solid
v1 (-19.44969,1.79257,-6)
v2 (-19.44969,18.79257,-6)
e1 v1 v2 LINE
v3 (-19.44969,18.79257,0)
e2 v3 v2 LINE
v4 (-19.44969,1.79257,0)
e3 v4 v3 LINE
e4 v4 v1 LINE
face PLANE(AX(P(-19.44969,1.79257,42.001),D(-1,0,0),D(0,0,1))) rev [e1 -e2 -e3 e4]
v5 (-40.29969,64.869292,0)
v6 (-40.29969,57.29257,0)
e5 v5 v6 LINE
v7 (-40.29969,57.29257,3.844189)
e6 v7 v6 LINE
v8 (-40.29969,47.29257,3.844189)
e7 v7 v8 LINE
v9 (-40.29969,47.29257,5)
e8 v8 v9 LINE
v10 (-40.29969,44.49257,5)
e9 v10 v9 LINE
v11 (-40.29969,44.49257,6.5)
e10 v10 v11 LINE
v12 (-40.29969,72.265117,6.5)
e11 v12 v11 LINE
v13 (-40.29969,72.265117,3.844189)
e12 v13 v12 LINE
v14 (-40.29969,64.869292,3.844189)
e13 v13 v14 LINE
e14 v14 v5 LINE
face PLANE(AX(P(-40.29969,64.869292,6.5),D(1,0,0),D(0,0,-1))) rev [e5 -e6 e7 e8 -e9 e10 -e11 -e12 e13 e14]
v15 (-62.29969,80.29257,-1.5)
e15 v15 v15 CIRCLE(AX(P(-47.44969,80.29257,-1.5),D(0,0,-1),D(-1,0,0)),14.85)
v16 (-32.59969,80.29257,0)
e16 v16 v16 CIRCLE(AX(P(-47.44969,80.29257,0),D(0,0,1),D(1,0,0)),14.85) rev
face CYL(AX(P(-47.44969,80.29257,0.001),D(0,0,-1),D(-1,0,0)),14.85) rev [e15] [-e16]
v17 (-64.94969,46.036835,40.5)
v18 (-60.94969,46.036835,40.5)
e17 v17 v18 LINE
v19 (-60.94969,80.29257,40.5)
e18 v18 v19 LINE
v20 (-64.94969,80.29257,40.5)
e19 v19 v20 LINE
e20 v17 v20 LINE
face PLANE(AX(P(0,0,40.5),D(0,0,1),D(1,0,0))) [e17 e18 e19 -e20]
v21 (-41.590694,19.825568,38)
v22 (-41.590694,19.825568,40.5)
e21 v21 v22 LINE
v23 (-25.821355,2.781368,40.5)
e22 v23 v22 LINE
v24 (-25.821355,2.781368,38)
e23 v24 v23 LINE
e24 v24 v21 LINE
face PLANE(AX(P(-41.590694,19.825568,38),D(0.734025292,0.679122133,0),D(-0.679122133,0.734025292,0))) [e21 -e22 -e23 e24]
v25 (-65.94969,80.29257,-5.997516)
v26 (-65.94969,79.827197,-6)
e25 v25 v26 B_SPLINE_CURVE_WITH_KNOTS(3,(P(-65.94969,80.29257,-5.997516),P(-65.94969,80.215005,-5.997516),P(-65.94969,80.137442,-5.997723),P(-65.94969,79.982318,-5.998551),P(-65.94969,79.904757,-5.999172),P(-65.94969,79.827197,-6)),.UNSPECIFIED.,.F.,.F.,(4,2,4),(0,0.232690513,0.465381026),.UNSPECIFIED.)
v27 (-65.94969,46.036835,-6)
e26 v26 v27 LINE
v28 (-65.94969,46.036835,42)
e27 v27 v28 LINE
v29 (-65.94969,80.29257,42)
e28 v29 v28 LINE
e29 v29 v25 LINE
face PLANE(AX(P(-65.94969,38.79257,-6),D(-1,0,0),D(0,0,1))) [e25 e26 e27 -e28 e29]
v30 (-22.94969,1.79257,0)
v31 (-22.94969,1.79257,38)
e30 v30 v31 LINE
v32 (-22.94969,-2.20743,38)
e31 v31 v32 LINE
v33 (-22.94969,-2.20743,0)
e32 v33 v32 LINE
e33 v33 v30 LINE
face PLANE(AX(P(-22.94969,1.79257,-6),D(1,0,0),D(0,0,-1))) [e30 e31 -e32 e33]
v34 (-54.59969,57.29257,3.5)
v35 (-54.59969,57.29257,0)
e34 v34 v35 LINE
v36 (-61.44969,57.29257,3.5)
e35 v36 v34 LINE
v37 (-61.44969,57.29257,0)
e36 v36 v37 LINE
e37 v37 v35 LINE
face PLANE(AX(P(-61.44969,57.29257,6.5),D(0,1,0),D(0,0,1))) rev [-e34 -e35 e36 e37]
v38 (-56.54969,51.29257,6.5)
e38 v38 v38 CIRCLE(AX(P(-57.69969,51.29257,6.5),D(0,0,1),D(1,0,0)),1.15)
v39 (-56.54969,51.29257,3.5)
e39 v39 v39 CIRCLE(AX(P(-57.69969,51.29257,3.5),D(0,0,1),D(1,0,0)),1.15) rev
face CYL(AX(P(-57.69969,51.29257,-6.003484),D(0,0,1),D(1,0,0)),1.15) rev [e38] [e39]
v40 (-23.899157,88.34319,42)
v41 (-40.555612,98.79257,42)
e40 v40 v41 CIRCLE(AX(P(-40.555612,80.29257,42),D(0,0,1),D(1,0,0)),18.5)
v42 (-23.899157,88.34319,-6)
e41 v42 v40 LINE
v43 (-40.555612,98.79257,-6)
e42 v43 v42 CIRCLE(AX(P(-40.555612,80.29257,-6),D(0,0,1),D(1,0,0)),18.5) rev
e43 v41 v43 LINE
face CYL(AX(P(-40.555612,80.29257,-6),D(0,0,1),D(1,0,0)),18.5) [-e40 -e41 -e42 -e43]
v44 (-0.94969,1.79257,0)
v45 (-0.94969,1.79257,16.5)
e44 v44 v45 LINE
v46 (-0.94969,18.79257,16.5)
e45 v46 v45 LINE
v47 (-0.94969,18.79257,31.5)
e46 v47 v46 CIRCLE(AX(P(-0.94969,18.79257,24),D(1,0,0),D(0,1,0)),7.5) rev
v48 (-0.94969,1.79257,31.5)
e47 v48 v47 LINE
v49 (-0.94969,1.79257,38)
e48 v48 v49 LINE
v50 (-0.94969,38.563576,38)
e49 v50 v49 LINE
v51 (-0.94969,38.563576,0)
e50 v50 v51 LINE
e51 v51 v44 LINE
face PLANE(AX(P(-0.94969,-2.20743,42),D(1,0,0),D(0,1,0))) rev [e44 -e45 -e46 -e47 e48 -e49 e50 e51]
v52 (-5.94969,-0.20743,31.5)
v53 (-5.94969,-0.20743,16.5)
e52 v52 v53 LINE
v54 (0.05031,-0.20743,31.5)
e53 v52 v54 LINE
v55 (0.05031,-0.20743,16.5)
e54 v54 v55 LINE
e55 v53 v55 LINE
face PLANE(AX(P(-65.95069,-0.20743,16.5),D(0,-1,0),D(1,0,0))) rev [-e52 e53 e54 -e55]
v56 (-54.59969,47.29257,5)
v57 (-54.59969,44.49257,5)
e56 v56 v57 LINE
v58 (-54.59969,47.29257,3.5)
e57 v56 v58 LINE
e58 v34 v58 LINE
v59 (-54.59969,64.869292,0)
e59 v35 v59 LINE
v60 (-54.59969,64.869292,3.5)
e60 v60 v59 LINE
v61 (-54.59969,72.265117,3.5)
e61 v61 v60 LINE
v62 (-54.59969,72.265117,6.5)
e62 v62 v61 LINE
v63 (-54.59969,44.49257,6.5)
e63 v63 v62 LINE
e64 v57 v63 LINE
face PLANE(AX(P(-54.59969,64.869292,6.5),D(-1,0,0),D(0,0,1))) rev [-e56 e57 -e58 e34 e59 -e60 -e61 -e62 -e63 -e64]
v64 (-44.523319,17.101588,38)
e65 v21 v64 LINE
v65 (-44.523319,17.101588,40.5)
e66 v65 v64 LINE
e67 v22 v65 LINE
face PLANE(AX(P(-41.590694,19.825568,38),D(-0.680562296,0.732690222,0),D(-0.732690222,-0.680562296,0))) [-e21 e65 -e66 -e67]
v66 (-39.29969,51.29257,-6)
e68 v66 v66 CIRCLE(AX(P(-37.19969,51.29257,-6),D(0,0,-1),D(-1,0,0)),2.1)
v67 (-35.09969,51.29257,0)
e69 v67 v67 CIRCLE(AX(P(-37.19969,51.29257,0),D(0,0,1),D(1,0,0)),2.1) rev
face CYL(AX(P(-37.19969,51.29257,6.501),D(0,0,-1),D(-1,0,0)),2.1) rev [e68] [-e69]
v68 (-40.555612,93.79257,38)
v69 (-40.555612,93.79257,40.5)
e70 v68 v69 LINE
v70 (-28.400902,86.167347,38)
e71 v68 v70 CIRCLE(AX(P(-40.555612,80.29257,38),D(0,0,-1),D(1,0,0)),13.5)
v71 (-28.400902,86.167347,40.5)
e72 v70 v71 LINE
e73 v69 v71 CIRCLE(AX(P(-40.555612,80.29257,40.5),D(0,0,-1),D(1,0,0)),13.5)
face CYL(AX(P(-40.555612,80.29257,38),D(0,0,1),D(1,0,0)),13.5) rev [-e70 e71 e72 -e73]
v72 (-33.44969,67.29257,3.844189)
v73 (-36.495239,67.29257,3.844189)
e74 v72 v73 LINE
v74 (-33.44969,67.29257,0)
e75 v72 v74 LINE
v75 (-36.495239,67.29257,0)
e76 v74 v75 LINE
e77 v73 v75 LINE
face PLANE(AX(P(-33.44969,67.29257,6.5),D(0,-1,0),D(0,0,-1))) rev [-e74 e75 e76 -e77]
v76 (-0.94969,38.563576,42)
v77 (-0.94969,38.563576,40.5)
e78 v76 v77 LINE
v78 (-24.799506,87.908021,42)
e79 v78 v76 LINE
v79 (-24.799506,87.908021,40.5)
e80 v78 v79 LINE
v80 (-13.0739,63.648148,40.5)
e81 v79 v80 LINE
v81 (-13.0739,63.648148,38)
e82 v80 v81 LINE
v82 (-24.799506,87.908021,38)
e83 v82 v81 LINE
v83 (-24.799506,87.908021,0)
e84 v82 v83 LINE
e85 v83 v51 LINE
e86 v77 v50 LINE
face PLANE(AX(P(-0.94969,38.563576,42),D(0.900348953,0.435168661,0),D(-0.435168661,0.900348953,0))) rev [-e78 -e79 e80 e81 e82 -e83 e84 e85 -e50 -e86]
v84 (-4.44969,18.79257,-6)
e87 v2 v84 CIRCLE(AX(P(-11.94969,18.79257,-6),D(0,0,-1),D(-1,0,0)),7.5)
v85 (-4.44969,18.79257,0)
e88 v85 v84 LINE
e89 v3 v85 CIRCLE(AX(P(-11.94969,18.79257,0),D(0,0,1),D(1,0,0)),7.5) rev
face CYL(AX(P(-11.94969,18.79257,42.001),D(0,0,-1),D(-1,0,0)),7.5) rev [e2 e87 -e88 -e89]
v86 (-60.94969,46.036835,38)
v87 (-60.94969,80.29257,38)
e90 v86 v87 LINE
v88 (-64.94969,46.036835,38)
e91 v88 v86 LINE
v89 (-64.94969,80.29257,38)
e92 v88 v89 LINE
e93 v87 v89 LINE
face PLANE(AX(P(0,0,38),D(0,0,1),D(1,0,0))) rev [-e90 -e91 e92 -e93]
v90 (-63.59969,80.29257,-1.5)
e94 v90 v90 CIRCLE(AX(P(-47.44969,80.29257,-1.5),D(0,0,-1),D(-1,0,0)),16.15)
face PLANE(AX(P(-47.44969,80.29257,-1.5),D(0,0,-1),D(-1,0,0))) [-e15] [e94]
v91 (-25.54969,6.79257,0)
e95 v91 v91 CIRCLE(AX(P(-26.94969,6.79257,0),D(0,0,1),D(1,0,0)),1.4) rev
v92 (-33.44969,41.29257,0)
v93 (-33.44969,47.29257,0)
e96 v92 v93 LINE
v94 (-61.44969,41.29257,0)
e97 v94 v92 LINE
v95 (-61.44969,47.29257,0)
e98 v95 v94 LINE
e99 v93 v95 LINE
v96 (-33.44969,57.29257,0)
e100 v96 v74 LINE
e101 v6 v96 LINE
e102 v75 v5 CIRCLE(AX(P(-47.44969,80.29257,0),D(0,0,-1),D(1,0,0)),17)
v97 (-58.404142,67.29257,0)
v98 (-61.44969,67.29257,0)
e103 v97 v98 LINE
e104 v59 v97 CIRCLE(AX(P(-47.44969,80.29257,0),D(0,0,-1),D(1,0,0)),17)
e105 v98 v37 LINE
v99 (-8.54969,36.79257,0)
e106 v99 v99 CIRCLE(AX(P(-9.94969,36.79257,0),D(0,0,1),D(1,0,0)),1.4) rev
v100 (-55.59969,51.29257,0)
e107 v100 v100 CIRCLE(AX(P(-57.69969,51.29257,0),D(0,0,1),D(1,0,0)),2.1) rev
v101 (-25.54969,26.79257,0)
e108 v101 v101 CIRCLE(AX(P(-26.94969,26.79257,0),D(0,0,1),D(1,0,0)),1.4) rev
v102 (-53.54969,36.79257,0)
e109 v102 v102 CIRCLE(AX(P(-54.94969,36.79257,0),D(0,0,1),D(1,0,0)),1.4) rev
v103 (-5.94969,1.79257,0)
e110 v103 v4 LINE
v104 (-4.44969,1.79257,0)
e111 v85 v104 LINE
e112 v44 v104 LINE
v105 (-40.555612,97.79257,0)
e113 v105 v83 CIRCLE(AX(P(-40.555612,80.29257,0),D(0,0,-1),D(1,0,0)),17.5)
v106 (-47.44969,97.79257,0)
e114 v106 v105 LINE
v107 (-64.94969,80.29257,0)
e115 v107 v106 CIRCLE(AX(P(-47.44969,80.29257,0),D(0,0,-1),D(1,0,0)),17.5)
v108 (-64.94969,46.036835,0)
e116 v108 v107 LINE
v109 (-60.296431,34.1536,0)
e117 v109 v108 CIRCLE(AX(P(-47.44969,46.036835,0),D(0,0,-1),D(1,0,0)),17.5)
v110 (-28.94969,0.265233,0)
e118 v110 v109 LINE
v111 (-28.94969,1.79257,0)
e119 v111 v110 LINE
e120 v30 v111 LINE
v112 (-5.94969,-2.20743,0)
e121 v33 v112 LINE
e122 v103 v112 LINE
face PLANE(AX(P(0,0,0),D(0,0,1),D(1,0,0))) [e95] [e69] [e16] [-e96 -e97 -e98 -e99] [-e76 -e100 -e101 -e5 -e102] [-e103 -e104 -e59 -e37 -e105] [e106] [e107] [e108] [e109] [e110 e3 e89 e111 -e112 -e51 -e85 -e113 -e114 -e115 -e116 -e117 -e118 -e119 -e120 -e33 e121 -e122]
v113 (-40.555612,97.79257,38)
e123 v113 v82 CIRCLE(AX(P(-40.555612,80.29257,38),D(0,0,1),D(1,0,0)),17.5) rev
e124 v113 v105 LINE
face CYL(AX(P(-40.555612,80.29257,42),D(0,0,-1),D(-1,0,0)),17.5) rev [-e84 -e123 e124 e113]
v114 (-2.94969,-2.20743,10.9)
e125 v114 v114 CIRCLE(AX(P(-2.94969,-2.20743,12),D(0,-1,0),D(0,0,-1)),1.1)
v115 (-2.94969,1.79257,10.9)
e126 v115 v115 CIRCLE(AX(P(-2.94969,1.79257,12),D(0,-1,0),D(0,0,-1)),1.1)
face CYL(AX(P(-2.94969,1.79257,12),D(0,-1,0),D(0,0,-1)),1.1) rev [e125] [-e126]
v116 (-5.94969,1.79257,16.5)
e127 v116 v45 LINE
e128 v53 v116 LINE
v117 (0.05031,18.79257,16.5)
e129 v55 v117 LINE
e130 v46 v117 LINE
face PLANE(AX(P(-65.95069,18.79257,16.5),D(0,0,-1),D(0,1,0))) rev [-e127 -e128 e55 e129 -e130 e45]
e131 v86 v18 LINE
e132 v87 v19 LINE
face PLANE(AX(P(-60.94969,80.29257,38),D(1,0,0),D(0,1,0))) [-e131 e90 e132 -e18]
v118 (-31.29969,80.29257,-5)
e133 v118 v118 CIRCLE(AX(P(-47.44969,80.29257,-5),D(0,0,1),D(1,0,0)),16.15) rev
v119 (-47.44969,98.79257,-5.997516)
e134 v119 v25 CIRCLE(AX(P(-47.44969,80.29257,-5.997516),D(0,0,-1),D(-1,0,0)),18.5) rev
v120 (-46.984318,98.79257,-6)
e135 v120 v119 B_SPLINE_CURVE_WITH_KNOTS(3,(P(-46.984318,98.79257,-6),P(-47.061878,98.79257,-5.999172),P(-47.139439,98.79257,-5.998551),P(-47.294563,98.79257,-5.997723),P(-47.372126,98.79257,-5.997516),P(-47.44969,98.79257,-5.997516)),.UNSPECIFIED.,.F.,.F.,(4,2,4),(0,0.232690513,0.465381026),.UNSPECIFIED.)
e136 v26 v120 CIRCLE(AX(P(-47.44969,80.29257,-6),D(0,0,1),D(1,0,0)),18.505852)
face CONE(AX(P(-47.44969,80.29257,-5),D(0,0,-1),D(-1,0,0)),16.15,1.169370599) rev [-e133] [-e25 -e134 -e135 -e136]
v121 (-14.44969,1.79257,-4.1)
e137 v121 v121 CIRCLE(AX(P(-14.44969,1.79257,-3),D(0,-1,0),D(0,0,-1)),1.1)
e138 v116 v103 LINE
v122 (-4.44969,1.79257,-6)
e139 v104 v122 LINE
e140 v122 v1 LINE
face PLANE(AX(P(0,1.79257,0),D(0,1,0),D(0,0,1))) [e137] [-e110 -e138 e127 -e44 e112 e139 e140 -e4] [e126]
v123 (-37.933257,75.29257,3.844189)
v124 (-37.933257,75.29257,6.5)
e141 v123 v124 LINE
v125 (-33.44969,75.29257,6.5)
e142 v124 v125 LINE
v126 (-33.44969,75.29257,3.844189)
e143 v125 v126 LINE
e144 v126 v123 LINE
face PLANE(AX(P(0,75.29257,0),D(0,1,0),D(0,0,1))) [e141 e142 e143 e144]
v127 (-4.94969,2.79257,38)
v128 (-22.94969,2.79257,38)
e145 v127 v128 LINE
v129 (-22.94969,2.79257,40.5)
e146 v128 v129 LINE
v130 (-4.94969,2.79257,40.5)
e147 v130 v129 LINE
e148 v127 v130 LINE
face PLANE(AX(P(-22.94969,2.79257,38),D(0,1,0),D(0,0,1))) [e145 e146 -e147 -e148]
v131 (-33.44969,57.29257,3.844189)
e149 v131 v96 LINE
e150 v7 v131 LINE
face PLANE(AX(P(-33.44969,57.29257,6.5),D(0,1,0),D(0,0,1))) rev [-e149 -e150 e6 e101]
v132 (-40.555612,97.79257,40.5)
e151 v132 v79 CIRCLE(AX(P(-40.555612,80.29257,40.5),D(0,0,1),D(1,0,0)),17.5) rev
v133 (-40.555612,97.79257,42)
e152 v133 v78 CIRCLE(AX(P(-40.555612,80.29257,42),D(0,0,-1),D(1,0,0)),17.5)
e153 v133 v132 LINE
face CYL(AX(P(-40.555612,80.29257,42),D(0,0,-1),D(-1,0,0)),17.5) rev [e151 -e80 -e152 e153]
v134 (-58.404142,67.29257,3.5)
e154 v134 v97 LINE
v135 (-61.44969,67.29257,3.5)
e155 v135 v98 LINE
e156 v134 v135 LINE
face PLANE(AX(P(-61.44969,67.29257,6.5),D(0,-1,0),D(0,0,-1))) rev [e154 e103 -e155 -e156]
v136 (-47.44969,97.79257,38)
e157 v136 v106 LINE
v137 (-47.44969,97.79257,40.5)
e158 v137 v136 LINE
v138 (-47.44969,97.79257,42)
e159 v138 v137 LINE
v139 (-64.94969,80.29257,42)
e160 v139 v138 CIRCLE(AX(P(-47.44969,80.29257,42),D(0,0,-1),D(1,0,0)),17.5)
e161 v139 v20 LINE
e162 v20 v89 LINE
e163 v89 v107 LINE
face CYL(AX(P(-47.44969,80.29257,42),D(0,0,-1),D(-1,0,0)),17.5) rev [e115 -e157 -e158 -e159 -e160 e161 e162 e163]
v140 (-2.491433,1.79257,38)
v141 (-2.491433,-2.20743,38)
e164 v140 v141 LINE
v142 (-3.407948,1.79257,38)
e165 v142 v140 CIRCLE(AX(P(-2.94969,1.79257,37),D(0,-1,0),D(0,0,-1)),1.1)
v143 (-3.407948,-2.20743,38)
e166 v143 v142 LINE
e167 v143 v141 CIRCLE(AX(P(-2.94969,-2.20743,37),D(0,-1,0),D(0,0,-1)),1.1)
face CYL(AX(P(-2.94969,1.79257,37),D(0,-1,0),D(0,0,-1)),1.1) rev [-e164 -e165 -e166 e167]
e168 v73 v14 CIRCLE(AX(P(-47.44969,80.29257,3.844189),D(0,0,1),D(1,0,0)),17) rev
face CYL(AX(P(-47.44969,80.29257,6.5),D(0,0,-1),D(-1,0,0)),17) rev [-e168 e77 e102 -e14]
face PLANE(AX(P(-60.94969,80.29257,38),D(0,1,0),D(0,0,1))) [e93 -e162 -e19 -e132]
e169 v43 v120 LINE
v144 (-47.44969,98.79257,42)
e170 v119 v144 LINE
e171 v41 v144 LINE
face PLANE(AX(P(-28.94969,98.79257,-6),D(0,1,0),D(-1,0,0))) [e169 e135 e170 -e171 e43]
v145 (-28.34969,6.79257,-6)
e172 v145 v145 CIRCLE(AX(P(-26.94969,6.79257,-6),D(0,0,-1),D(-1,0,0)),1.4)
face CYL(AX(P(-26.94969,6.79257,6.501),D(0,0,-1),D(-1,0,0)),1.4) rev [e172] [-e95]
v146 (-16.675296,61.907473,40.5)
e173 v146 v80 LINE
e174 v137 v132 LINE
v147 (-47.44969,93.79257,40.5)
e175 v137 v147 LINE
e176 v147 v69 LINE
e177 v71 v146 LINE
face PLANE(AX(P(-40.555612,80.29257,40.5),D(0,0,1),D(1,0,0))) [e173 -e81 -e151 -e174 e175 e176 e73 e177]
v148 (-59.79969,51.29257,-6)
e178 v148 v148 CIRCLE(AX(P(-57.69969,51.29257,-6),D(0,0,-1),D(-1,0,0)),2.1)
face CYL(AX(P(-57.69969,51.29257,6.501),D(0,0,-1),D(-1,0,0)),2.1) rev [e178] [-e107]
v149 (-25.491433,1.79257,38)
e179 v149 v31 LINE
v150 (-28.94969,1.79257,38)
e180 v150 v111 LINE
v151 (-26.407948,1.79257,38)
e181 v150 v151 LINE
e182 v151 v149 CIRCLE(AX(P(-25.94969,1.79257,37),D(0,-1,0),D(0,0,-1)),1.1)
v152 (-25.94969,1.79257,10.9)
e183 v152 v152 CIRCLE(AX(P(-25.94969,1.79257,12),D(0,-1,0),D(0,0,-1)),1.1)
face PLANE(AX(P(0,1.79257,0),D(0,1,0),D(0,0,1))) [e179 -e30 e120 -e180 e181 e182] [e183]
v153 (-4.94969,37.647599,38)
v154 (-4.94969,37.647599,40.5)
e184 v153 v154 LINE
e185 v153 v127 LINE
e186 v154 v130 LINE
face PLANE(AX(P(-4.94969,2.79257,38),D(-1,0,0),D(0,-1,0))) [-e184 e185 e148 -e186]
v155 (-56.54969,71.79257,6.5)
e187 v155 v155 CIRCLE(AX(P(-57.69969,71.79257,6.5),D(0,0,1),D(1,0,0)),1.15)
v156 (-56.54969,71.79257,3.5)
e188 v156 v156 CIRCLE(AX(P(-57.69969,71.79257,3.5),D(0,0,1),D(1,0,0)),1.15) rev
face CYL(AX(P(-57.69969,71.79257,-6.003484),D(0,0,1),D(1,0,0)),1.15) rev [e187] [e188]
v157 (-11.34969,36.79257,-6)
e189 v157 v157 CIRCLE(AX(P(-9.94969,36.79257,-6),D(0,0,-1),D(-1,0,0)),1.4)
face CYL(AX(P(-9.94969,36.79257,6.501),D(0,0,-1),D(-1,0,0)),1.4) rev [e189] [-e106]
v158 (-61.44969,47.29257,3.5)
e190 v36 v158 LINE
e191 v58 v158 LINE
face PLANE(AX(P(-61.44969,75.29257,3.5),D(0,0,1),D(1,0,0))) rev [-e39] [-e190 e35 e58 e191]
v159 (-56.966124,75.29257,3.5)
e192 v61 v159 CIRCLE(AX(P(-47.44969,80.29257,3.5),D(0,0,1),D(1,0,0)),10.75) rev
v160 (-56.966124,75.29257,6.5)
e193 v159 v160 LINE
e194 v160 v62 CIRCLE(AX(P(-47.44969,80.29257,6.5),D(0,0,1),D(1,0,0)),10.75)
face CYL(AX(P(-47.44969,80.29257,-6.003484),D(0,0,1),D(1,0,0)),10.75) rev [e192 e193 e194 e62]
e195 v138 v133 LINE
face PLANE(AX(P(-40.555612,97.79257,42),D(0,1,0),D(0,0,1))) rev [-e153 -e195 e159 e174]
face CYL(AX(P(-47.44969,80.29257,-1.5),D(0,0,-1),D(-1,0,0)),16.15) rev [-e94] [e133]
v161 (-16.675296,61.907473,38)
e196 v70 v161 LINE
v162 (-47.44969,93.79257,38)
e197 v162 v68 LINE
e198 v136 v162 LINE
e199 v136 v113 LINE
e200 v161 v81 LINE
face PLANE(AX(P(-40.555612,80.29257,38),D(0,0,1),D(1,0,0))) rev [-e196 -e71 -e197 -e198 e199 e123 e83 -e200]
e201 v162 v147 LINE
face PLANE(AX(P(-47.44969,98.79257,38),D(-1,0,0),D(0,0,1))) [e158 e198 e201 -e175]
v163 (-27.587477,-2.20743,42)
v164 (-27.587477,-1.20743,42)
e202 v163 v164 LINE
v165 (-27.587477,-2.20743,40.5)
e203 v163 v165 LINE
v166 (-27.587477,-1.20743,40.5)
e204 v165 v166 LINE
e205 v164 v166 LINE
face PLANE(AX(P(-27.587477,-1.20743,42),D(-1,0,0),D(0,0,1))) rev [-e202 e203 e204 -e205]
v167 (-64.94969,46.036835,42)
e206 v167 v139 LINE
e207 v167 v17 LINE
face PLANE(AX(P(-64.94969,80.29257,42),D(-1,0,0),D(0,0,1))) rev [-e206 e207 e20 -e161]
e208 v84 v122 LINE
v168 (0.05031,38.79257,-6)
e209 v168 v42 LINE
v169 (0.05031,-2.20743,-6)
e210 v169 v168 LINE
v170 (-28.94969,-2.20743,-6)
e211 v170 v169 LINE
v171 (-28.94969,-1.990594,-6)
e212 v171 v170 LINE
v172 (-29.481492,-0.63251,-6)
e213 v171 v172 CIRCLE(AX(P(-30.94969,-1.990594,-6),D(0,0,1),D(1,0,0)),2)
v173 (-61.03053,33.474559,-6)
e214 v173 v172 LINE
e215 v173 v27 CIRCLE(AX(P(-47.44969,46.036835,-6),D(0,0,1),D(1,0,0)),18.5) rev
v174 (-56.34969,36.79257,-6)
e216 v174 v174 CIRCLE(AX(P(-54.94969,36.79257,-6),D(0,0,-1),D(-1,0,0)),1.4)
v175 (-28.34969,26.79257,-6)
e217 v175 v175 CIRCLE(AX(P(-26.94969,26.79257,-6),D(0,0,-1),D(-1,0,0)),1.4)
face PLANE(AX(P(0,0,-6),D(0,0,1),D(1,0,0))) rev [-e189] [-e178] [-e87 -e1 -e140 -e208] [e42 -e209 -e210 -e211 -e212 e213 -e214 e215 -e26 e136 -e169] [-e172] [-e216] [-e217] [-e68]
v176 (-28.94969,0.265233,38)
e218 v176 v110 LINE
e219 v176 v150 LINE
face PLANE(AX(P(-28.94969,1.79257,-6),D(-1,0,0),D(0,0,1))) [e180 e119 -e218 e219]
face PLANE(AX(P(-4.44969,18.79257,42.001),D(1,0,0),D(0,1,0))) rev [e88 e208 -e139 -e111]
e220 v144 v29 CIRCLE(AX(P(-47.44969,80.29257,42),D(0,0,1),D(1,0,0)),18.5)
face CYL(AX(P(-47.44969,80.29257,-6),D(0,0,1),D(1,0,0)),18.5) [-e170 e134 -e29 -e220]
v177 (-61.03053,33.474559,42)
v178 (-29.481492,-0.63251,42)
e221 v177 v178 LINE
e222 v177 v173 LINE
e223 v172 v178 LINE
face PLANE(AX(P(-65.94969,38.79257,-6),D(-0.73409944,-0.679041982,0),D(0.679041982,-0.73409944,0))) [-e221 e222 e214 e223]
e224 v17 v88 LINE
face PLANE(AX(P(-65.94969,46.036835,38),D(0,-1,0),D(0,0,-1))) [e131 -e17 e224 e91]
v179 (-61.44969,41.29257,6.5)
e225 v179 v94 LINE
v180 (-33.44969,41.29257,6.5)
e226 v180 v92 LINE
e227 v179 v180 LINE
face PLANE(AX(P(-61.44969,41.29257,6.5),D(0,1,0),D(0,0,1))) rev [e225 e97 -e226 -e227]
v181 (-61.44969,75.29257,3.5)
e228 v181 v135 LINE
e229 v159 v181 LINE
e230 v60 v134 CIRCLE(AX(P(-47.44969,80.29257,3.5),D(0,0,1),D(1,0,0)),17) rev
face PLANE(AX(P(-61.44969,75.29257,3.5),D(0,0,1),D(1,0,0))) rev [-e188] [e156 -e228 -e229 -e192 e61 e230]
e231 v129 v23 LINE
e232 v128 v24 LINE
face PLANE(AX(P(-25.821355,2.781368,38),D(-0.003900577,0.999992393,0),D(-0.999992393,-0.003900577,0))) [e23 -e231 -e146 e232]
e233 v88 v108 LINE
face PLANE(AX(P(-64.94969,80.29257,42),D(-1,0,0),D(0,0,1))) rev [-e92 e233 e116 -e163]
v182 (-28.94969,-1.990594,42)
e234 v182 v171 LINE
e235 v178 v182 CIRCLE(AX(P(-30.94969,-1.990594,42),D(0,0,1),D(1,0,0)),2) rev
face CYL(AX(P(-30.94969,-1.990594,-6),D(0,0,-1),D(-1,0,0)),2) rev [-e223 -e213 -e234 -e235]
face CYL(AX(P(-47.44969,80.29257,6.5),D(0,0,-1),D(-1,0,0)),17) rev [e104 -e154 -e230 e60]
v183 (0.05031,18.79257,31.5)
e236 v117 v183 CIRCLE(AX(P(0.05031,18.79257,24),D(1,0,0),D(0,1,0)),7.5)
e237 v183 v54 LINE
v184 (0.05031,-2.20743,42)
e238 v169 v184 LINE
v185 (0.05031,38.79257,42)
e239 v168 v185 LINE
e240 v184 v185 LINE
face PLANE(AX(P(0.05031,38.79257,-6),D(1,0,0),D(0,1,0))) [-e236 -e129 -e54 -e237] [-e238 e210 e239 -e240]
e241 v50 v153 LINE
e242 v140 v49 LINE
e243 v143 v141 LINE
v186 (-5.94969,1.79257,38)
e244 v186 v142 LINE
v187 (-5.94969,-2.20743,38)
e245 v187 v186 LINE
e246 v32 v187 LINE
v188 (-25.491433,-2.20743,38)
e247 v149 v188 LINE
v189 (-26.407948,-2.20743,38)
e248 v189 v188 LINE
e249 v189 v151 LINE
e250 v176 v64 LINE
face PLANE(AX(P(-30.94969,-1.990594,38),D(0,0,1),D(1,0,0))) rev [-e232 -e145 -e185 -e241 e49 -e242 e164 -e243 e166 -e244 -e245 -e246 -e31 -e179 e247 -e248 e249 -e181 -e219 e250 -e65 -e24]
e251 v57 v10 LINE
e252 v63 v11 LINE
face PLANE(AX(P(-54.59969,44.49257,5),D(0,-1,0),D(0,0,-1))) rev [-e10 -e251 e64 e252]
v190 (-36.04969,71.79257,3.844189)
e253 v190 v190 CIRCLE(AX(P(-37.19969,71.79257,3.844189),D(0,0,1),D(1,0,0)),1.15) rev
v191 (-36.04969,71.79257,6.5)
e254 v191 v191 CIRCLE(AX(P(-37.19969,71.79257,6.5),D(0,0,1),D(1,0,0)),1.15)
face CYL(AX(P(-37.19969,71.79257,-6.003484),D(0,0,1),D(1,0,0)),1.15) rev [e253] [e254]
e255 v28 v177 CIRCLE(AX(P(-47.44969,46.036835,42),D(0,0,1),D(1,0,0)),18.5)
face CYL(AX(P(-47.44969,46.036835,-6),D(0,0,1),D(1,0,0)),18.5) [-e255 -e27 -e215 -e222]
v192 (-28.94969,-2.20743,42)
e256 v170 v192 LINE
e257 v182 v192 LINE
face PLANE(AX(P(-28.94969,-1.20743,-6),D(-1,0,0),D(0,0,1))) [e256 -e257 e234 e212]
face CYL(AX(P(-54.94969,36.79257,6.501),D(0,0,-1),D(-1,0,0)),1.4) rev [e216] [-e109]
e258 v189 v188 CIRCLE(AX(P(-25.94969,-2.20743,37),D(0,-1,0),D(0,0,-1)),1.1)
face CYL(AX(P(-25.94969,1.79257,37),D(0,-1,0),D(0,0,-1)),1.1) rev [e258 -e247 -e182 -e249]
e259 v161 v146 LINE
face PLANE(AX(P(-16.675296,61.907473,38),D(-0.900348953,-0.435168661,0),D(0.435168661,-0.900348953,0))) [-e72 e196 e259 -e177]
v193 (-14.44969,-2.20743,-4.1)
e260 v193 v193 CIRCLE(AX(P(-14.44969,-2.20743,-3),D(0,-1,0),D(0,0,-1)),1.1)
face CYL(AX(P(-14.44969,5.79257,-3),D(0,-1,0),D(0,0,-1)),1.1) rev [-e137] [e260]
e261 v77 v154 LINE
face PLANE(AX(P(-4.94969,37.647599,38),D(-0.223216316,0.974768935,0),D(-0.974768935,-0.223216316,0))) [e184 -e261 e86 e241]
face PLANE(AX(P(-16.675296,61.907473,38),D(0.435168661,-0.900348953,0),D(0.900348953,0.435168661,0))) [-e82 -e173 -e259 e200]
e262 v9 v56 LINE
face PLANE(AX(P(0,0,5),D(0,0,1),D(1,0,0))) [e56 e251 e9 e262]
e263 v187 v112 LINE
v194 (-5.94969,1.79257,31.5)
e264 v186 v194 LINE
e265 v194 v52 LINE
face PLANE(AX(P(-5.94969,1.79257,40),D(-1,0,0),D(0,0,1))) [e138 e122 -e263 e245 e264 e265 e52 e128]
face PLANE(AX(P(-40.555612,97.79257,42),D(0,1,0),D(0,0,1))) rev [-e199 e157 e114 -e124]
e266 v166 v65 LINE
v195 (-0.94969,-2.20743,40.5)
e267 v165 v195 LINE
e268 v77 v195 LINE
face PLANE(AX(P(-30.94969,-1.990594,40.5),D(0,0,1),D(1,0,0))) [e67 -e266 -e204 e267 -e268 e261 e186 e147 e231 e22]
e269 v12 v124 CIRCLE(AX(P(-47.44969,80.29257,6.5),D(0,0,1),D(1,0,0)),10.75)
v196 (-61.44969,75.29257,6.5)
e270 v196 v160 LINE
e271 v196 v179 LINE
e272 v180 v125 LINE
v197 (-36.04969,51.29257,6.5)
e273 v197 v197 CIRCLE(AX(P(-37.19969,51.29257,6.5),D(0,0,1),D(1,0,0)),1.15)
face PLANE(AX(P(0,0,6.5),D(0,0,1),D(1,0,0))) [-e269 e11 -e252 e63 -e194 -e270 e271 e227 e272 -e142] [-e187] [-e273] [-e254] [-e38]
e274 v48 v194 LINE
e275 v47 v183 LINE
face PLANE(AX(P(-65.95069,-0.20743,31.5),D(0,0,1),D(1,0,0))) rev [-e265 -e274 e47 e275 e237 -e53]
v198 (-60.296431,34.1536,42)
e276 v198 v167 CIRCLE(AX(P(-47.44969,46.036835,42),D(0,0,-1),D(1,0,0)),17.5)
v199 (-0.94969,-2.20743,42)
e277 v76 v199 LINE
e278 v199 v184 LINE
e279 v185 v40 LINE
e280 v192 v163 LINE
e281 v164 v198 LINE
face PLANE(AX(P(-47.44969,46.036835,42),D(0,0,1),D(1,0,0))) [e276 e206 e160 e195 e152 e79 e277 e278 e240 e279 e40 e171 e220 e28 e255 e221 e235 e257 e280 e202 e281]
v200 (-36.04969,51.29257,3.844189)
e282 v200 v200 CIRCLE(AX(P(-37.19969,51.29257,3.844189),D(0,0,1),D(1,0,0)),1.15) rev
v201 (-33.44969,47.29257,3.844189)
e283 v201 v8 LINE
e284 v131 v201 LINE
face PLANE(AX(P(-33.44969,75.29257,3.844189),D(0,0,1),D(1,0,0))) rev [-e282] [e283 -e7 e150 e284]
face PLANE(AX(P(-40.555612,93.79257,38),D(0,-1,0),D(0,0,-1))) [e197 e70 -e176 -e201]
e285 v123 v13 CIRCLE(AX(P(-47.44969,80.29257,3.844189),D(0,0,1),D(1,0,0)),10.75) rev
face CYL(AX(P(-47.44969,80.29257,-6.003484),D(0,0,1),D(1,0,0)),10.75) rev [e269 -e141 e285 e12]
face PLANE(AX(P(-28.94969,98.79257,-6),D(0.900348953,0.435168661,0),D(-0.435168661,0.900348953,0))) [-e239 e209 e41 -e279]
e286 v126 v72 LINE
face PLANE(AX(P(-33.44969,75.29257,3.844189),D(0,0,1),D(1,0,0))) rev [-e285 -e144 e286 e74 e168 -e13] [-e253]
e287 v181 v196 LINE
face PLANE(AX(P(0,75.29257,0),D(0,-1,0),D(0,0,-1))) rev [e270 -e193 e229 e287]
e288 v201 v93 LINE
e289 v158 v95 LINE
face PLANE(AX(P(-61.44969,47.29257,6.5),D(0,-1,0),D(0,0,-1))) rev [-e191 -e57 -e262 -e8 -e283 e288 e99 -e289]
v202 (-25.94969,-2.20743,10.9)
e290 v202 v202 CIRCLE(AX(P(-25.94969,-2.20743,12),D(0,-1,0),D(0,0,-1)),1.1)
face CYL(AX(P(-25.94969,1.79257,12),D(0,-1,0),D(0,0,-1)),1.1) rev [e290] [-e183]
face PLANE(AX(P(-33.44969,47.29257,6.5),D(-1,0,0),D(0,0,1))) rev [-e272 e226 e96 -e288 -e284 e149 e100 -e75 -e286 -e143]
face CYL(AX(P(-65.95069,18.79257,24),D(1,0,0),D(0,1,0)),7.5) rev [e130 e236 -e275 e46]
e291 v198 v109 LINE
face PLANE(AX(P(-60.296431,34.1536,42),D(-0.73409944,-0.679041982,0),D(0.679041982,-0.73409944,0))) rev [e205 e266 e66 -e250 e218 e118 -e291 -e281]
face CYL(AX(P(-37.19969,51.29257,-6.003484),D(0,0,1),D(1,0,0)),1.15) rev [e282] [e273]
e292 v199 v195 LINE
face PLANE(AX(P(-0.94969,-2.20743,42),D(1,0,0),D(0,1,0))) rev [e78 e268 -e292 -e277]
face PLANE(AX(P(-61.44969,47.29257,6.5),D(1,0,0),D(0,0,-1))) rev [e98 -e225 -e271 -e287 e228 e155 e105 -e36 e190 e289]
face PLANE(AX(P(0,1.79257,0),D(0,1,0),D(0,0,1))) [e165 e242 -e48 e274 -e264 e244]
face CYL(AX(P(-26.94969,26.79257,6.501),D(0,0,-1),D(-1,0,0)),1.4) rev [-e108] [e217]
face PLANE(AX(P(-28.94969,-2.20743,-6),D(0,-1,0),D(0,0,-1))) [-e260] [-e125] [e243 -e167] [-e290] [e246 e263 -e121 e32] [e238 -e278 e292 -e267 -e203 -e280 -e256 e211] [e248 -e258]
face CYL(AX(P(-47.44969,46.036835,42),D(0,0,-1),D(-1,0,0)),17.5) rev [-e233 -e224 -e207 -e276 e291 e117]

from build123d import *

# Parameters (mm, degrees)
EXTRUDE_1_DEPTH      = 6
FILLET_1_R           = 18.5
SKETCH_3_R           = 16.15
CUT_EXTRUDE_1_DEPTH  = 4.5
CUT_EXTRUDE_2_REACH  = 120.868
SKETCH_4_R           = 14.85
CHAMFER_1_SIZE       = 2.355852366
CHAMFER_1_SIZE_2     = 1
SKETCH_5_W           = 28
SKETCH_5_H           = 6
EXTRUDE_2_DEPTH      = 6.5
SKETCH_6_W           = 14.3
SKETCH_6_H           = 2.8
CUT_EXTRUDE_3_DEPTH  = 1.5
SKETCH_7_W           = 6.85
SKETCH_7_H           = 3
SKETCH_7_H_2         = 2.655811089
EXTRUDE_3_DEPTH      = 28
CUT_EXTRUDE_4_REACH  = 121.439
SKETCH_8_R           = 1.15
CUT_EXTRUDE_5_REACH  = 121.439
SKETCH_9_R           = 2.1
CUT_EXTRUDE_START    = -3
SKETCH_10_R          = 10.75
CUT_EXTRUDE_6_DEPTH  = 3
CUT_EXTRUDE_7_REACH  = 121.439
SKETCH_11_R          = 1.4
EXTRUDE_4_DEPTH      = 42
SKETCH_13_R          = 1.1
CUT_EXTRUDE_8_DEPTH  = 8
SKETCH_14_W          = 6
SKETCH_14_H          = 46
SKETCH_14_R          = 1.1
EXTRUDE_5_DEPTH      = 4
FILLET_2_R           = 2
CUT_EXTRUDE_10_REACH = 128.016
CUT_EXTRUDE_11_REACH = 130.115
EXTRUDE_START        = -1.5
SKETCH_17_W          = 5
SKETCH_17_H          = 34.255734548
EXTRUDE_6_DEPTH      = 2.5


with BuildPart() as part:
    # 스케치1 → 보스-돌출1 (new body)
    with BuildSketch(Plane.XY):
        Polygon((-65.949690405, 38.792569711), (-28.949690405, -1.207430289), (-28.949690405, -2.207430289), (0.050309595, -2.207430289), (0.050309595, -1.207430289), (0.050309595, 38.792569711), (-28.949690405, 98.792569711), (-65.949690405, 98.792569711), align=None)
    extrude(amount=-EXTRUDE_1_DEPTH)

    # 필렛1
    fillet_1_edges = [part.edges().sort_by_distance(p)[0] for p in [
        (-65.949690405, 98.792569711, -3),
        (-28.949690405, 98.792569711, -3),
        (-65.949690405, 38.792569711, -3),
    ]]
    fillet(fillet_1_edges, radius=FILLET_1_R)

    # 스케치3 → 컷-돌출1 (cut)
    with BuildSketch(Plane(origin=(0, 0, -6), x_dir=(-1, 0, 0), z_dir=(0, 0, -1))):
        with Locations((47.449690405, 80.292569711)):
            Circle(SKETCH_3_R)
    extrude(amount=-CUT_EXTRUDE_1_DEPTH, mode=Mode.SUBTRACT)

    # 스케치4 → 컷-돌출2 (cut, up to next)
    with BuildSketch(Plane(origin=(0, 0, -1.5), x_dir=(-1, 0, 0), z_dir=(0, 0, -1)), mode=Mode.PRIVATE) as cut_extrude_2_sk1:
        with Locations((47.449690405, 80.292569711)):
            Circle(SKETCH_4_R)
    cut_extrude_2_tool1 = extrude(cut_extrude_2_sk1.sketch, amount=-CUT_EXTRUDE_2_REACH, mode=Mode.PRIVATE) & part.part
    add(cut_extrude_2_tool1.solids().sort_by_distance((-47.44969, 80.29257, -1.5))[0], mode=Mode.SUBTRACT)

    # 모따기1
    # the kernel refuses this chamfer: 2.355852366, 1 mm, written as the material it takes off along each edge
    with BuildSketch(Plane(origin=(-47.449690405, 80.292569711, -6), x_dir=(-1, 0, 0), z_dir=(0, -1, 0))) as chamfer_1_piece_1:
        Polygon((16.15 + CHAMFER_1_SIZE, 0), (16.15, -CHAMFER_1_SIZE_2), (16.15, 0), align=None)
    revolve(axis=Axis((-47.449690405, 80.292569711, -6), (0, 0, -1)), mode=Mode.SUBTRACT)

    # 스케치5 → 보스-돌출2 (add)
    with BuildSketch(Plane.XY):
        with Locations((-47.449690405, 44.292569711)):
            Rectangle(SKETCH_5_W, SKETCH_5_H)
        with BuildLine():
            Line((-61.449690405, 67.292569711), (-58.404141555, 67.292569711))
            ThreePointArc((-58.404141555, 67.292569711), (-56.582644842, 65.954189634), (-54.599690405, 64.86929185))
            Line((-54.599690405, 64.86929185), (-54.599690405, 57.292569711))
            Line((-54.599690405, 57.292569711), (-61.449690405, 57.292569711))
            Line((-61.449690405, 57.292569711), (-61.449690405, 67.292569711))
        make_face()
        with BuildLine():
            Line((-33.449690405, 67.292569711), (-36.495239255, 67.292569711))
            ThreePointArc((-36.495239255, 67.292569711), (-38.316735967, 65.954189634), (-40.299690405, 64.86929185))
            Line((-40.299690405, 64.86929185), (-40.299690405, 57.292569711))
            Line((-40.299690405, 57.292569711), (-33.449690405, 57.292569711))
            Line((-33.449690405, 57.292569711), (-33.449690405, 67.292569711))
        make_face()
    extrude(amount=EXTRUDE_2_DEPTH)

    # 스케치6 → 컷-돌출3 (cut)
    with BuildSketch(Plane.XY.offset(6.5)):
        with Locations((-47.449690405, 45.892569711)):
            Rectangle(SKETCH_6_W, SKETCH_6_H)
    extrude(amount=-CUT_EXTRUDE_3_DEPTH, mode=Mode.SUBTRACT)

    # 스케치7 → 보스-돌출3 (add)
    with BuildSketch(Plane(origin=(0, 47.292569711, 0), x_dir=(1, 0, 0), z_dir=(0, 1, 0))):
        with Locations((-58.024690405, -5)):
            Rectangle(SKETCH_7_W, SKETCH_7_H)
        with Locations((-36.874690405, -5.172094455)):
            Rectangle(SKETCH_7_W, SKETCH_7_H_2)
    extrude(amount=EXTRUDE_3_DEPTH)

    # 스케치8 → 컷-돌출4 (cut, up to next)
    with BuildSketch(Plane.XY.offset(6.5), mode=Mode.PRIVATE) as cut_extrude_4_sk1:
        with Locations((-57.699690405, 71.792569711)):
            Circle(SKETCH_8_R)
    cut_extrude_4_tool1 = extrude(cut_extrude_4_sk1.sketch, amount=-CUT_EXTRUDE_4_REACH, mode=Mode.PRIVATE) & part.part
    # 스케치8 → 컷-돌출4 (cut, up to next)
    with BuildSketch(Plane.XY.offset(6.5), mode=Mode.PRIVATE) as cut_extrude_4_sk2:
        with Locations((-37.199690405, 71.792569711)):
            Circle(SKETCH_8_R)
    cut_extrude_4_tool2 = extrude(cut_extrude_4_sk2.sketch, amount=-CUT_EXTRUDE_4_REACH, mode=Mode.PRIVATE) & part.part
    # 스케치8 → 컷-돌출4 (cut, up to next)
    with BuildSketch(Plane.XY.offset(6.5), mode=Mode.PRIVATE) as cut_extrude_4_sk3:
        with Locations((-37.199690405, 51.292569711)):
            Circle(SKETCH_8_R)
    cut_extrude_4_tool3 = extrude(cut_extrude_4_sk3.sketch, amount=-CUT_EXTRUDE_4_REACH, mode=Mode.PRIVATE) & part.part
    # 스케치8 → 컷-돌출4 (cut, up to next)
    with BuildSketch(Plane.XY.offset(6.5), mode=Mode.PRIVATE) as cut_extrude_4_sk4:
        with Locations((-57.699690405, 51.292569711)):
            Circle(SKETCH_8_R)
    cut_extrude_4_tool4 = extrude(cut_extrude_4_sk4.sketch, amount=-CUT_EXTRUDE_4_REACH, mode=Mode.PRIVATE) & part.part
    add(cut_extrude_4_tool1.solids().sort_by_distance((-57.69969, 71.79257, 6.5))[0], mode=Mode.SUBTRACT)
    add(cut_extrude_4_tool2.solids().sort_by_distance((-37.19969, 71.79257, 6.5))[0], mode=Mode.SUBTRACT)
    add(cut_extrude_4_tool3.solids().sort_by_distance((-37.19969, 51.29257, 6.5))[0], mode=Mode.SUBTRACT)
    add(cut_extrude_4_tool4.solids().sort_by_distance((-57.69969, 51.29257, 6.5))[0], mode=Mode.SUBTRACT)

    # 스케치9 → 컷-돌출5 (cut, up to next)
    with BuildSketch(Plane(origin=(0, 0, -6), x_dir=(-1, 0, 0), z_dir=(0, 0, -1)), mode=Mode.PRIVATE) as cut_extrude_5_sk1:
        with Locations((57.699690405, 51.292569711)):
            Circle(SKETCH_9_R)
    cut_extrude_5_tool1 = extrude(cut_extrude_5_sk1.sketch, amount=-CUT_EXTRUDE_5_REACH, mode=Mode.PRIVATE) & part.part
    # 스케치9 → 컷-돌출5 (cut, up to next)
    with BuildSketch(Plane(origin=(0, 0, -6), x_dir=(-1, 0, 0), z_dir=(0, 0, -1)), mode=Mode.PRIVATE) as cut_extrude_5_sk2:
        with Locations((37.199690405, 51.292569711)):
            Circle(SKETCH_9_R)
    cut_extrude_5_tool2 = extrude(cut_extrude_5_sk2.sketch, amount=-CUT_EXTRUDE_5_REACH, mode=Mode.PRIVATE) & part.part
    add(cut_extrude_5_tool1.solids().sort_by_distance((-57.69969, 51.29257, -6))[0], mode=Mode.SUBTRACT)
    add(cut_extrude_5_tool2.solids().sort_by_distance((-37.19969, 51.29257, -6))[0], mode=Mode.SUBTRACT)

    # 스케치10 → 컷-돌출6 (cut)
    with BuildSketch(Plane.XY.offset(6.5).offset(CUT_EXTRUDE_START)):
        with Locations((-47.449690405, 80.292569711)):
            Circle(SKETCH_10_R)
    extrude(amount=CUT_EXTRUDE_6_DEPTH, mode=Mode.SUBTRACT)

    # 스케치11 → 컷-돌출7 (cut, up to next)
    with BuildSketch(Plane(origin=(0, 0, -6), x_dir=(-1, 0, 0), z_dir=(0, 0, -1)), mode=Mode.PRIVATE) as cut_extrude_7_sk1:
        with Locations((9.949690405, 36.792569711)):
            Circle(SKETCH_11_R)
    cut_extrude_7_tool1 = extrude(cut_extrude_7_sk1.sketch, amount=-CUT_EXTRUDE_7_REACH, mode=Mode.PRIVATE) & part.part
    # 스케치11 → 컷-돌출7 (cut, up to next)
    with BuildSketch(Plane(origin=(0, 0, -6), x_dir=(-1, 0, 0), z_dir=(0, 0, -1)), mode=Mode.PRIVATE) as cut_extrude_7_sk2:
        with Locations((26.949690405, 26.792569711)):
            Circle(SKETCH_11_R)
    cut_extrude_7_tool2 = extrude(cut_extrude_7_sk2.sketch, amount=-CUT_EXTRUDE_7_REACH, mode=Mode.PRIVATE) & part.part
    # 스케치11 → 컷-돌출7 (cut, up to next)
    with BuildSketch(Plane(origin=(0, 0, -6), x_dir=(-1, 0, 0), z_dir=(0, 0, -1)), mode=Mode.PRIVATE) as cut_extrude_7_sk3:
        with Locations((26.949690405, 6.792569711)):
            Circle(SKETCH_11_R)
    cut_extrude_7_tool3 = extrude(cut_extrude_7_sk3.sketch, amount=-CUT_EXTRUDE_7_REACH, mode=Mode.PRIVATE) & part.part
    # 스케치11 → 컷-돌출7 (cut, up to next)
    with BuildSketch(Plane(origin=(0, 0, -6), x_dir=(-1, 0, 0), z_dir=(0, 0, -1)), mode=Mode.PRIVATE) as cut_extrude_7_sk4:
        with Locations((54.949690405, 36.792569711)):
            Circle(SKETCH_11_R)
    cut_extrude_7_tool4 = extrude(cut_extrude_7_sk4.sketch, amount=-CUT_EXTRUDE_7_REACH, mode=Mode.PRIVATE) & part.part
    add(cut_extrude_7_tool1.solids().sort_by_distance((-9.94969, 36.79257, -6))[0], mode=Mode.SUBTRACT)
    add(cut_extrude_7_tool2.solids().sort_by_distance((-26.94969, 26.79257, -6))[0], mode=Mode.SUBTRACT)
    add(cut_extrude_7_tool3.solids().sort_by_distance((-26.94969, 6.79257, -6))[0], mode=Mode.SUBTRACT)
    add(cut_extrude_7_tool4.solids().sort_by_distance((-54.94969, 36.79257, -6))[0], mode=Mode.SUBTRACT)

    # 스케치12 → 보스-돌출4 (add)
    with BuildSketch(Plane.XY):
        with BuildLine():
            Line((-0.949690405, -2.207430289), (-0.949690405, 38.563575631))
            Line((-0.949690405, 38.563575631), (-24.799505797, 87.908021271))
            ThreePointArc((-24.799505797, 87.908021271), (-31.255623286, 95.116880864), (-40.555612472, 97.792569711))
            Line((-40.555612472, 97.792569711), (-47.449690405, 97.792569711))
            ThreePointArc((-47.449690405, 97.792569711), (-59.824059075, 92.666938382), (-64.949690405, 80.292569711))
            Line((-64.949690405, 80.292569711), (-64.949690405, 46.036835163))
            ThreePointArc((-64.949690405, 46.036835163), (-63.744903711, 39.65592431), (-60.296430597, 34.153600485))
            Line((-60.296430597, 34.153600485), (-27.587477132, -1.207430289))
            Line((-27.587477132, -1.207430289), (-27.587477132, -2.207430289))
            Line((-27.587477132, -2.207430289), (-28.949690405, -2.207430289))
            Line((-28.949690405, -2.207430289), (-28.949690405, -1.207430289))
            Line((-28.949690405, -1.207430289), (-61.030530037, 33.474558503))
            ThreePointArc((-61.030530037, 33.474558503), (-64.676058757, 39.291300833), (-65.949690405, 46.036835163))
            Line((-65.949690405, 46.036835163), (-65.949690405, 80.292569711))
            ThreePointArc((-65.949690405, 80.292569711), (-60.531165857, 93.374045163), (-47.449690405, 98.792569711))
            Line((-47.449690405, 98.792569711), (-40.555612472, 98.792569711))
            ThreePointArc((-40.555612472, 98.792569711), (-30.724195333, 95.963984358), (-23.899156844, 88.343189931))
            Line((-23.899156844, 88.343189931), (0.050309595, 38.792569711))
            Line((0.050309595, 38.792569711), (0.050309595, -1.207430289))
            Line((0.050309595, -1.207430289), (0.050309595, -2.207430289))
            Line((0.050309595, -2.207430289), (-0.949690405, -2.207430289))
        make_face()
    extrude(amount=EXTRUDE_4_DEPTH)

    # 스케치13 → 컷-돌출8 (cut)
    with BuildSketch(Plane.XZ.offset(2.207430289)):
        with Locations(Location((-14.449690405, -3, 0), (0, 0, 270))):
            Circle(SKETCH_13_R)
    extrude(amount=-CUT_EXTRUDE_8_DEPTH, mode=Mode.SUBTRACT)

    # 스케치14 → 보스-돌출5 (add)
    # profile 1 of 2: a face of its own
    with BuildSketch(Plane.XZ.offset(2.207430289)):
        with Locations((-25.949690405, 17)):
            Rectangle(SKETCH_14_W, SKETCH_14_H)
        with Locations(Location((-25.949690405, 37, 0), (0, 0, 270))):
            Circle(SKETCH_14_R, mode=Mode.SUBTRACT)
        with Locations(Location((-25.949690405, 12, 0), (0, 0, 270))):
            Circle(SKETCH_14_R, mode=Mode.SUBTRACT)
    # profile 2 of 2: a face of its own
    with BuildSketch(Plane.XZ.offset(2.207430289)):
        with Locations((-2.949690405, 17)):
            Rectangle(SKETCH_14_W, SKETCH_14_H)
        with Locations(Location((-2.949690405, 37, 0), (0, 0, 270))):
            Circle(SKETCH_14_R, mode=Mode.SUBTRACT)
        with Locations(Location((-2.949690405, 12, 0), (0, 0, 270))):
            Circle(SKETCH_14_R, mode=Mode.SUBTRACT)
    extrude(amount=-EXTRUDE_5_DEPTH)

    # 필렛2
    fillet_2_edges = [part.edges().sort_by_distance(p)[0] for p in [
        (-28.949690405, -1.207430289, 18),
    ]]
    fillet(fillet_2_edges, radius=FILLET_2_R)

    # 스케치15 → 컷-돌출10 (cut, up to next)
    with BuildSketch(Plane(origin=(0.050309595, 0, 0), x_dir=(0, 0, -1), z_dir=(1, 0, 0)), mode=Mode.PRIVATE) as cut_extrude_10_sk1:
        with BuildLine():
            Line((-16.5, 18.792569711), (-16.5, -0.207430289))
            Line((-16.5, -0.207430289), (-31.5, -0.207430289))
            Line((-31.5, -0.207430289), (-31.5, 18.792569711))
            ThreePointArc((-31.5, 18.792569711), (-24, 26.292569711), (-16.5, 18.792569711))
        make_face()
    cut_extrude_10_tool1 = extrude(cut_extrude_10_sk1.sketch, amount=-CUT_EXTRUDE_10_REACH, mode=Mode.PRIVATE) & part.part
    add(cut_extrude_10_tool1.solids().sort_by_distance((0.05031, 12.294103, 24))[0], mode=Mode.SUBTRACT)

    # 스케치16 → 컷-돌출11 (cut, up to next)
    with BuildSketch(Plane(origin=(0, 0, -6), x_dir=(-1, 0, 0), z_dir=(0, 0, -1)), mode=Mode.PRIVATE) as cut_extrude_11_sk1:
        with BuildLine():
            Line((4.449690405, 18.792569711), (4.449690405, 1.792569711))
            Line((4.449690405, 1.792569711), (19.449690405, 1.792569711))
            Line((19.449690405, 1.792569711), (19.449690405, 18.792569711))
            ThreePointArc((19.449690405, 18.792569711), (11.949690405, 26.292569711), (4.449690405, 18.792569711))
        make_face()
    cut_extrude_11_tool1 = extrude(cut_extrude_11_sk1.sketch, amount=-CUT_EXTRUDE_11_REACH, mode=Mode.PRIVATE) & part.part
    add(cut_extrude_11_tool1.solids().sort_by_distance((-11.94969, 13.299021, -6))[0], mode=Mode.SUBTRACT)

    # 스케치17 → 보스-돌출6 (add)
    with BuildSketch(Plane.XY.offset(42).offset(EXTRUDE_START)):
        with BuildLine():
            Line((-5.949690405, 2.792569711), (-4.949690405, 2.792569711))
            Line((-4.949690405, 2.792569711), (-4.949690405, 37.64759931))
            Line((-4.949690405, 37.64759931), (0.050309595, 38.792569711))
            Line((0.050309595, 38.792569711), (0.050309595, -2.207430289))
            Line((0.050309595, -2.207430289), (-0.949690405, -2.207430289))
            Line((-0.949690405, -2.207430289), (-5.949690405, -2.207430289))
            Line((-5.949690405, -2.207430289), (-22.949690405, -2.207430289))
            Line((-22.949690405, -2.207430289), (-27.587477132, -2.207430289))
            Line((-27.587477132, -2.207430289), (-28.949690405, -2.207430289))
            Line((-28.949690405, -2.207430289), (-28.949690405, -1.990594121))
            ThreePointArc((-28.949690405, -1.990594121), (-29.087380313, -1.261347167), (-29.481491525, -0.632510158))
            Line((-29.481491525, -0.632510158), (-45.256010781, 16.421024173))
            Line((-45.256010781, 16.421024173), (-41.590694155, 19.825568444))
            Line((-41.590694155, 19.825568444), (-25.82135547, 2.781368476))
            Line((-25.82135547, 2.781368476), (-22.949690405, 2.792569711))
            Line((-22.949690405, 2.792569711), (-5.949690405, 2.792569711))
        make_face()
        with Locations((-63.449690405, 63.164702437)):
            Rectangle(SKETCH_17_W, SKETCH_17_H)
        with BuildLine():
            Line((-16.675296007, 61.90747297), (-28.400901609, 86.167346629))
            ThreePointArc((-28.400901609, 86.167346629), (-33.3813351, 91.728466886), (-40.555612472, 93.792569711))
            Line((-40.555612472, 93.792569711), (-47.449690405, 93.792569711))
            Line((-47.449690405, 93.792569711), (-47.449690405, 98.792569711))
            Line((-47.449690405, 98.792569711), (-40.555612472, 98.792569711))
            ThreePointArc((-40.555612472, 98.792569711), (-30.724195333, 95.963984358), (-23.899156844, 88.343189931))
            Line((-23.899156844, 88.343189931), (-12.173551242, 64.083316272))
            Line((-12.173551242, 64.083316272), (-16.675296007, 61.90747297))
        make_face()
    extrude(amount=-EXTRUDE_6_DEPTH)


solid = part.part
